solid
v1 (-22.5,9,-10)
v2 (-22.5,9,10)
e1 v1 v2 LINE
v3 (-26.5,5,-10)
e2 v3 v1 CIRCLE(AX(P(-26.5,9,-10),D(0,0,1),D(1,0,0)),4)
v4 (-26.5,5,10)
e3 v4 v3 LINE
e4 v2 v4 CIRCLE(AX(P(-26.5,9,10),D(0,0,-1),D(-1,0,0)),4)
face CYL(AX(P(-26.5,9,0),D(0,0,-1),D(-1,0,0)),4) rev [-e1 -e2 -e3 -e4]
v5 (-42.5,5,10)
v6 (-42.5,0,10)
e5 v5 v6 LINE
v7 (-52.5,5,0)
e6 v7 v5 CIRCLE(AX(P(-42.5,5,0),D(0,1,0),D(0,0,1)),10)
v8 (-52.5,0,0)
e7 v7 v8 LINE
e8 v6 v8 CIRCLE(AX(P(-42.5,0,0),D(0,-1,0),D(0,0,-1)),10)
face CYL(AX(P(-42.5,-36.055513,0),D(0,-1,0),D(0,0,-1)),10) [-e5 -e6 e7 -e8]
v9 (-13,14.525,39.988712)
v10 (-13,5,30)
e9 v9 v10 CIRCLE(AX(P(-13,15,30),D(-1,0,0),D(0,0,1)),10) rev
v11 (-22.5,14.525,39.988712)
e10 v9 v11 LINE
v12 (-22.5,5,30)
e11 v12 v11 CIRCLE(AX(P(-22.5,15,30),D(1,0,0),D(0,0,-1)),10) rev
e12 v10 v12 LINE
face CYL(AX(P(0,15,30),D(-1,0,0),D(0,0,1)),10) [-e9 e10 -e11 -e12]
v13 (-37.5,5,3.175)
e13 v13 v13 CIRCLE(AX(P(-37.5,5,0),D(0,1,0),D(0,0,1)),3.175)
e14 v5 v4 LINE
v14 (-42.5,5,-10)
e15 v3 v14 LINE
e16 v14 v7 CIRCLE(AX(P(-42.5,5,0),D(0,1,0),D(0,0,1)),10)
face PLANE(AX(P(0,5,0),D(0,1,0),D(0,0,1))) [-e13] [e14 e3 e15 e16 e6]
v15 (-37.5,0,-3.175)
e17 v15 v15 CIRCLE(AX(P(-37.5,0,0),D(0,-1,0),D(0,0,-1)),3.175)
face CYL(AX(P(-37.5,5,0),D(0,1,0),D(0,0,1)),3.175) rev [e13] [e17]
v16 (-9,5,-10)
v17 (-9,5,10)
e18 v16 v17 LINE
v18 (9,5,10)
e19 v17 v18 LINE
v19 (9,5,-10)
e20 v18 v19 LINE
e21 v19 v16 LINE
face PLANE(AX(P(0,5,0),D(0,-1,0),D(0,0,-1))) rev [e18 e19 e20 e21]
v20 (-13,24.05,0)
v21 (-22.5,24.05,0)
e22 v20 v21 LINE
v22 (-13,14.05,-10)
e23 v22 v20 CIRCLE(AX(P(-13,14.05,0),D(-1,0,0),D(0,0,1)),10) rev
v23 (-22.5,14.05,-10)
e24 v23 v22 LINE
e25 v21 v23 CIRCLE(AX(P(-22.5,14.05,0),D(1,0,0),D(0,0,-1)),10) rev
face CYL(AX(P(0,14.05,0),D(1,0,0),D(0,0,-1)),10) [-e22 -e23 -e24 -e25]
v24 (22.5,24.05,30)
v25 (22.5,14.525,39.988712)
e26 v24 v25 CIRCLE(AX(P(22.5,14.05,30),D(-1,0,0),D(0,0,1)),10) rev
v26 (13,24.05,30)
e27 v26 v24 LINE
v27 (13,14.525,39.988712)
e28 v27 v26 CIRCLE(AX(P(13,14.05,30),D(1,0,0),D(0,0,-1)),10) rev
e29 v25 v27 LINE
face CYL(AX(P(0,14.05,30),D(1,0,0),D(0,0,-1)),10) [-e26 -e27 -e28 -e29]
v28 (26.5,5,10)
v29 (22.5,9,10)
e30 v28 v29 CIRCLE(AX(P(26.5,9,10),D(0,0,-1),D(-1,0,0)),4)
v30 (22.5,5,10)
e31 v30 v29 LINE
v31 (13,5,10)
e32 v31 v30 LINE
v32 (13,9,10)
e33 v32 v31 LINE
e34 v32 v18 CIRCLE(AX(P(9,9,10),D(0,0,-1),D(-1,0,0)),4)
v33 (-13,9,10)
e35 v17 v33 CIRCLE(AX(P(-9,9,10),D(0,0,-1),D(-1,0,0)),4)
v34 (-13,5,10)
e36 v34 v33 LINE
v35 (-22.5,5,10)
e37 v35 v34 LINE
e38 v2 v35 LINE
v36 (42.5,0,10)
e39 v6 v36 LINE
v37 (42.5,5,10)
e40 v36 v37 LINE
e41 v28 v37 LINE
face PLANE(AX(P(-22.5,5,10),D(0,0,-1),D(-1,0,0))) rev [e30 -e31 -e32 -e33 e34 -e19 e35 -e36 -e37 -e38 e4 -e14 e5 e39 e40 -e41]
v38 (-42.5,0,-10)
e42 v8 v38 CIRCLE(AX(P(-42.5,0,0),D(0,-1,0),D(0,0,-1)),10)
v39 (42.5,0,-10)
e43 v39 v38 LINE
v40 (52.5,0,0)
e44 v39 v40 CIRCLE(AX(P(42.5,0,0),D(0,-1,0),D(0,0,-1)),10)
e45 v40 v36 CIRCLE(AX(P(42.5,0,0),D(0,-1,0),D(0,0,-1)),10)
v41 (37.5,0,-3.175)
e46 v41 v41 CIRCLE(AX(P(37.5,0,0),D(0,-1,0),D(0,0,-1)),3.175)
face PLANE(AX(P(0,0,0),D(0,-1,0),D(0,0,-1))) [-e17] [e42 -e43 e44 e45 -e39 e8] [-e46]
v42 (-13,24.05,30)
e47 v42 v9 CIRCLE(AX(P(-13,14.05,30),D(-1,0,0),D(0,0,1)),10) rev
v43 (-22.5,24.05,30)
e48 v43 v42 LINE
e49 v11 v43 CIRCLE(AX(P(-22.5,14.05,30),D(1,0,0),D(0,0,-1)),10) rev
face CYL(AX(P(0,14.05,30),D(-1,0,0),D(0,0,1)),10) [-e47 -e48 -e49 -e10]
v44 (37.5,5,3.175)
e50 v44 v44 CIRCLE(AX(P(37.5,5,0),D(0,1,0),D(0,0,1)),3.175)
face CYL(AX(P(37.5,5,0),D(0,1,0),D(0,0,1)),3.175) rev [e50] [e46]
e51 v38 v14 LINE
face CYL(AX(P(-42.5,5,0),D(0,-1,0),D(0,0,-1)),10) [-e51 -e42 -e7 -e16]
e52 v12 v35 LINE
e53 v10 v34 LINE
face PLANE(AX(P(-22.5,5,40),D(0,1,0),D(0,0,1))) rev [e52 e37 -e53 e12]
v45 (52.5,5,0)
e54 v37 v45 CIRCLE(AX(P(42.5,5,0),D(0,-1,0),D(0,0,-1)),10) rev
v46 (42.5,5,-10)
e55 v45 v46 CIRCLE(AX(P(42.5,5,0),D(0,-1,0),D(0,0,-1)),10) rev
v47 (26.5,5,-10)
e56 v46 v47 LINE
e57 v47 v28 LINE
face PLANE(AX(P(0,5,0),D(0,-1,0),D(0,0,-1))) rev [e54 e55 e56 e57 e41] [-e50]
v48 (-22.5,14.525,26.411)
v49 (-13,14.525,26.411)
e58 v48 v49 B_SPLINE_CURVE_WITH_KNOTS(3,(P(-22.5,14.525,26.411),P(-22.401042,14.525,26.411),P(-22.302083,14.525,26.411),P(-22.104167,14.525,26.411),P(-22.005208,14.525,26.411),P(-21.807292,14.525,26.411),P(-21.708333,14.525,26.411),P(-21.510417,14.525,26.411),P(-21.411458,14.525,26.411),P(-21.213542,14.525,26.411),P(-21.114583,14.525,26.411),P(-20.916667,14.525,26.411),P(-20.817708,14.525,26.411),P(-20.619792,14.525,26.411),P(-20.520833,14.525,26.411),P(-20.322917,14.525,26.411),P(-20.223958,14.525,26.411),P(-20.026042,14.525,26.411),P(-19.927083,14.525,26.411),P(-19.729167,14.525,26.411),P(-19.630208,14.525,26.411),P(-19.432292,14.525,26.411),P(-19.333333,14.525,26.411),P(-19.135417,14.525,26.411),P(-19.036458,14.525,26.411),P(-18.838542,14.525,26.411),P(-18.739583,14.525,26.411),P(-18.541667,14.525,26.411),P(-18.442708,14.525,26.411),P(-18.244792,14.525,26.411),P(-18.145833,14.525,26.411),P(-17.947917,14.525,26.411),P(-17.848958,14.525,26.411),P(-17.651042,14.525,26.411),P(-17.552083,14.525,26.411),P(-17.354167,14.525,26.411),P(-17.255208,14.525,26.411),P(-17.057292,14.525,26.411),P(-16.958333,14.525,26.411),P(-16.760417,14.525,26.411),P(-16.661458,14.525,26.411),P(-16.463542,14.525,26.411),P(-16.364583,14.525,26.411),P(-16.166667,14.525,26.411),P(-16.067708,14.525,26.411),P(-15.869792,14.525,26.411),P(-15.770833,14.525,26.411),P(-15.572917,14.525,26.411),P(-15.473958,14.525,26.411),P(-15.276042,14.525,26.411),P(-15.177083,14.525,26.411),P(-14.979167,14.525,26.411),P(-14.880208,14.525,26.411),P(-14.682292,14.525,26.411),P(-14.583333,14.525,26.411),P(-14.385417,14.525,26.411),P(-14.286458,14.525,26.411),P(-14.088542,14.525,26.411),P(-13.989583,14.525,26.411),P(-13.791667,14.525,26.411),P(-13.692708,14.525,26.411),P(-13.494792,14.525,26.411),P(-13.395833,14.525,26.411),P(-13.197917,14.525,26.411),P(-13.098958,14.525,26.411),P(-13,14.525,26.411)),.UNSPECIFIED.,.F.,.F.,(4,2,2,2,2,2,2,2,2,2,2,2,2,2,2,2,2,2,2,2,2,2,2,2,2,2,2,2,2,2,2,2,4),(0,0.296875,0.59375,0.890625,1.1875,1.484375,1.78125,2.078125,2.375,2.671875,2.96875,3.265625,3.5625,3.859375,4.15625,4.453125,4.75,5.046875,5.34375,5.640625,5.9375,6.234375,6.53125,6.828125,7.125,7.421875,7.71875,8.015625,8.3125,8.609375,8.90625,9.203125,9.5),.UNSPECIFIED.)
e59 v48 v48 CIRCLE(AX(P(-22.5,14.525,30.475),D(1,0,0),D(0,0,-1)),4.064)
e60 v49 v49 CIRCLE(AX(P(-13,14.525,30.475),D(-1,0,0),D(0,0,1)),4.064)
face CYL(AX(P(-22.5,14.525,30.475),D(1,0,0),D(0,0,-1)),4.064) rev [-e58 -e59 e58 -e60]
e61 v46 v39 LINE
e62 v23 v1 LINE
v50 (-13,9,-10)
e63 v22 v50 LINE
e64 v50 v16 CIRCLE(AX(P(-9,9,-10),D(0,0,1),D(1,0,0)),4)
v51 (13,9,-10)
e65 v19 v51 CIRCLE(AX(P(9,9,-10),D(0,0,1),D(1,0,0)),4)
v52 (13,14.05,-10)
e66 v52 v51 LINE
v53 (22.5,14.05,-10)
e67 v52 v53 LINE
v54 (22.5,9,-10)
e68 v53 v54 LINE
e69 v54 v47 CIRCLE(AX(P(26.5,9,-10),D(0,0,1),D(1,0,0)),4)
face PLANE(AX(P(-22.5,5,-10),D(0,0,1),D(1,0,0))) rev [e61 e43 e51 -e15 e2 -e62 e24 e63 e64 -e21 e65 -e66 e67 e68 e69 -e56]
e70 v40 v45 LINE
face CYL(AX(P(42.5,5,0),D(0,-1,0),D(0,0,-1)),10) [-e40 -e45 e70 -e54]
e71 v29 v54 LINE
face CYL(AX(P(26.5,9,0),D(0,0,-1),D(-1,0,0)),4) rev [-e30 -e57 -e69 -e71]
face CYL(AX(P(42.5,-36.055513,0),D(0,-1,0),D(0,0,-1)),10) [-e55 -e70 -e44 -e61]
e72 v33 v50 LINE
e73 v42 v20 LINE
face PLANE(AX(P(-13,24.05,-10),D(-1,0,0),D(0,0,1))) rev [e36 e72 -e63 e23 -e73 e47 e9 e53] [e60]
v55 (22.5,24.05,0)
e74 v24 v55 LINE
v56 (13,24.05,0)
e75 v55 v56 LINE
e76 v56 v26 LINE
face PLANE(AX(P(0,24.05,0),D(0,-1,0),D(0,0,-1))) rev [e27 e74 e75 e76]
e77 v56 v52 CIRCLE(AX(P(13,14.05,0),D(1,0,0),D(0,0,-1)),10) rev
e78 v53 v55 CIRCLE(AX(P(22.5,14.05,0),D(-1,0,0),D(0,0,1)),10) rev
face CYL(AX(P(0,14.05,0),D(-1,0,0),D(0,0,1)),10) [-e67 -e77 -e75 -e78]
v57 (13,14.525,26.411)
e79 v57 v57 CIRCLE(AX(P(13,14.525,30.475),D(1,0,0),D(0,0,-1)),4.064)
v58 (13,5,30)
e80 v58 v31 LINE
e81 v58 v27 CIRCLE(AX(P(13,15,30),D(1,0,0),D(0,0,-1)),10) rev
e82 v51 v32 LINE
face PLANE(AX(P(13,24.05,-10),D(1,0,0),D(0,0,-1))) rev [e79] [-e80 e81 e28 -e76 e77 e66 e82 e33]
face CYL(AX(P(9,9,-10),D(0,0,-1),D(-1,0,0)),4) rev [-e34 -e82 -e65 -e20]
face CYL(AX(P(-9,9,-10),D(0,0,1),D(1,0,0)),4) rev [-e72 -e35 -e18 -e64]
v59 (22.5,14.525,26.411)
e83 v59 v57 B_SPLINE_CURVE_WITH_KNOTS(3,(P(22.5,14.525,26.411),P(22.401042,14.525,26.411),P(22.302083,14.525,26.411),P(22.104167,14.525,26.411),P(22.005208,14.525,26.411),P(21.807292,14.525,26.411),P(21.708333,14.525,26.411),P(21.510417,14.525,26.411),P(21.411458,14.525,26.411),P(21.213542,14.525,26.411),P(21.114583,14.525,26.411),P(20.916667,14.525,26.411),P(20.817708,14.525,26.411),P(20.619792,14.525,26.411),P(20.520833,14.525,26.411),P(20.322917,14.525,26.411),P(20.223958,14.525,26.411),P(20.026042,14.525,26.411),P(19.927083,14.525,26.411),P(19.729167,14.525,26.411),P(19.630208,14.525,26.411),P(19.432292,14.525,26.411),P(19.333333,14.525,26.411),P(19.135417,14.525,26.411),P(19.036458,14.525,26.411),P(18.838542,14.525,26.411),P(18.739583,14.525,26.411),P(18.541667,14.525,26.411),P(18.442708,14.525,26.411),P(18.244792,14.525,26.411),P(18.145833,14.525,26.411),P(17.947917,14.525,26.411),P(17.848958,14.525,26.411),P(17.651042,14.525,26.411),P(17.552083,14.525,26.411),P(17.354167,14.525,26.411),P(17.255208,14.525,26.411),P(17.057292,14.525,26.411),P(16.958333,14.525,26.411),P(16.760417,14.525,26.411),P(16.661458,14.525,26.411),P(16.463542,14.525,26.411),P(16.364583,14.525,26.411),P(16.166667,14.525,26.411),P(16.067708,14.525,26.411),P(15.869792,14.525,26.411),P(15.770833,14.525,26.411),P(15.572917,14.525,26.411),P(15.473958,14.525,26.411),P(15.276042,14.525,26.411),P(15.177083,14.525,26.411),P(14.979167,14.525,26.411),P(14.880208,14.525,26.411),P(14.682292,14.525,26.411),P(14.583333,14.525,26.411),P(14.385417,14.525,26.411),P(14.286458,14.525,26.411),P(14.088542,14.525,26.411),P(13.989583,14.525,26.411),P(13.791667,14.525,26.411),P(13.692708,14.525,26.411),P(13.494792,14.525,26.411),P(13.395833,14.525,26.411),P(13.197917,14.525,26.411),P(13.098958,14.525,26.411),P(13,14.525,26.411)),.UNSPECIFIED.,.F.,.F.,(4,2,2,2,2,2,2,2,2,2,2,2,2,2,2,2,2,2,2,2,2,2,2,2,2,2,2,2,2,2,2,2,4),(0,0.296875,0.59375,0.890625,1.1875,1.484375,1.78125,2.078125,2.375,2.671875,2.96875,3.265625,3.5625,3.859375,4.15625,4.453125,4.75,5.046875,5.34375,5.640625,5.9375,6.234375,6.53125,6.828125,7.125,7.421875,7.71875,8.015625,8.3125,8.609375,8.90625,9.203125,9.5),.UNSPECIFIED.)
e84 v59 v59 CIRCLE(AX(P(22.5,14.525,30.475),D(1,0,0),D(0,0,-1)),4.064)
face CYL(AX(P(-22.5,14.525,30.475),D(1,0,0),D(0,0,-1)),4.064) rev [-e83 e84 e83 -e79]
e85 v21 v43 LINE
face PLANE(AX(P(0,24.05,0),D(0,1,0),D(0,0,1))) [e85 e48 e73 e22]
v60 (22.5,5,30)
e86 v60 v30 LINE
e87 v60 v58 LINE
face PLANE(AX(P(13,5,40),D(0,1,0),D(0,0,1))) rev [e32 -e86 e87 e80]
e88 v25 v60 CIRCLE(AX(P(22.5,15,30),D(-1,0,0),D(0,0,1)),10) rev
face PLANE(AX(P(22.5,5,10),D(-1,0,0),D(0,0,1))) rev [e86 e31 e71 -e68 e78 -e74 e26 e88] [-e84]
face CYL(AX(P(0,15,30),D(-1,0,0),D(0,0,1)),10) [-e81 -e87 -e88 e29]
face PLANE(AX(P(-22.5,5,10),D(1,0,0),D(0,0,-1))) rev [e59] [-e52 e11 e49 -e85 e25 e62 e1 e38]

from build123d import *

# Parameters (mm, degrees)
SKETCH1_W                   = 45
SKETCH1_H                   = 20
BOSS_EXTRUDE1_DEPTH         = 5
SKETCH2_W                   = 9.5
SKETCH2_H                   = 20
BOSS_EXTRUDE2_DEPTH         = 19.05
SKETCH3_W                   = 9.5
SKETCH3_H                   = 19.05
BOSS_EXTRUDE3_DEPTH         = 30
SKETCH4_R                   = 4.064
CUT_EXTRUDE1_DEPTH          = 65.833652527
SKETCH8_W                   = 30
SKETCH8_H                   = 20
BOSS_EXTRUDE4_DEPTH         = 5
F_1_4_0_25_DIAMETER_HOLE1_D = 6.35
FILLET1_R                   = 10
FILLET2_R                   = 4


with BuildPart() as part:
    # Sketch1 → Boss-Extrude1 (new body)
    with BuildSketch(Plane(origin=(0, 0, 0), x_dir=(1, 0, 0), z_dir=(0, 1, 0))):
        Rectangle(SKETCH1_W, SKETCH1_H)
    extrude(amount=BOSS_EXTRUDE1_DEPTH)

    # Sketch2 → Boss-Extrude2 (add)
    with BuildSketch(Plane(origin=(0, 5, 0), x_dir=(1, 0, 0), z_dir=(0, 1, 0))):
        with Locations((17.75, 0)):
            Rectangle(SKETCH2_W, SKETCH2_H)
        with Locations((-17.75, 0)):
            Rectangle(SKETCH2_W, SKETCH2_H)
    extrude(amount=BOSS_EXTRUDE2_DEPTH)

    # Sketch3 → Boss-Extrude3 (add)
    with BuildSketch(Plane.XY.offset(10)):
        with Locations((-17.75, 14.525)):
            Rectangle(SKETCH3_W, SKETCH3_H)
        with Locations((17.75, 14.525)):
            Rectangle(SKETCH3_W, SKETCH3_H)
    extrude(amount=BOSS_EXTRUDE3_DEPTH)

    # Sketch4 → Cut-Extrude1 (cut, through all)
    with BuildSketch(Plane(origin=(22.5, 0, 0), x_dir=(0, 0, -1), z_dir=(1, 0, 0))):
        with Locations((-30.475, 14.525)):
            Circle(SKETCH4_R)
    extrude(amount=-CUT_EXTRUDE1_DEPTH, mode=Mode.SUBTRACT)

    # Sketch8 → Boss-Extrude4 (add)
    with BuildSketch(Plane(origin=(0, 5, 0), x_dir=(1, 0, 0), z_dir=(0, 1, 0))):
        with Locations((37.5, 0)):
            Rectangle(SKETCH8_W, SKETCH8_H)
        with Locations((-37.5, 0)):
            Rectangle(SKETCH8_W, SKETCH8_H)
    extrude(amount=-BOSS_EXTRUDE4_DEPTH)

    # 1/4 (0.25) Diameter Hole1 (through all)
    with Locations(Plane(origin=(0, 5, 0), x_dir=(1, 0, 0), z_dir=(0, 1, 0))):
        with Locations((37.5, 0), (-37.5, 0)):
            Hole(F_1_4_0_25_DIAMETER_HOLE1_D / 2)

    # Fillet1
    # the kernel refuses this fillet: 10 mm, written as the material it takes off along each edge
    with BuildSketch(Plane(origin=(-47.5, 24.05, -10), x_dir=(0, -1, 0), z_dir=(1, 0, 0)), Plane(origin=(12, 5, 40), x_dir=(0, 0, -1), z_dir=(-1, 0, 0)), Plane(origin=(47.5, 5, 40), x_dir=(0, 0, -1), z_dir=(-1, 0, 0))) as fillet1_piece_1:
        with BuildLine():
            CenterArc((FILLET1_R, -FILLET1_R), FILLET1_R, 90, 90)
            Line((0, -FILLET1_R), (0, 0))
            Line((0, 0), (FILLET1_R, 0))
        make_face()
    extrude(amount=59.5, mode=Mode.SUBTRACT)
    with BuildSketch(Plane(origin=(-47.5, 24.05, 40), x_dir=(0, -1, 0), z_dir=(1, 0, 0)), Plane(origin=(-12, 24.05, 40), x_dir=(0, -1, 0), z_dir=(1, 0, 0)), Plane(origin=(47.5, 24.05, -10), x_dir=(0, -1, 0), z_dir=(-1, 0, 0))) as fillet1_piece_2:
        with BuildLine():
            CenterArc((FILLET1_R, FILLET1_R), FILLET1_R, 180, 90)
            Line((0, FILLET1_R), (0, 0))
            Line((0, 0), (FILLET1_R, 0))
        make_face()
    extrude(amount=59.5, mode=Mode.SUBTRACT)
    with BuildSketch(Plane(origin=(52.5, 30, 10), x_dir=(-1, 0, 0), z_dir=(0, -1, 0)), Plane(origin=(52.5, 30, -10), x_dir=(0, 0, 1), z_dir=(0, -1, 0))) as fillet1_piece_3:
        with BuildLine():
            CenterArc((FILLET1_R, FILLET1_R), FILLET1_R, 180, 90)
            Line((0, FILLET1_R), (0, 0))
            Line((0, 0), (FILLET1_R, 0))
        make_face()
    extrude(amount=55, mode=Mode.SUBTRACT)
    with BuildSketch(Plane(origin=(-52.5, 30, 10), x_dir=(1, 0, 0), z_dir=(0, -1, 0)), Plane(origin=(-52.5, 30, -10), x_dir=(0, 0, 1), z_dir=(0, -1, 0))) as fillet1_piece_4:
        with BuildLine():
            CenterArc((FILLET1_R, -FILLET1_R), FILLET1_R, 90, 90)
            Line((0, -FILLET1_R), (0, 0))
            Line((0, 0), (FILLET1_R, 0))
        make_face()
    extrude(amount=55, mode=Mode.SUBTRACT)

    # Fillet2
    fillet2_edges = [part.edges().sort_by_distance(p)[0] for p in [
        (13, 5, 0),
        (-13, 5, 0),
        (22.5, 5, 0),
        (-22.5, 5, 0),
    ]]
    fillet(fillet2_edges, radius=FILLET2_R)


solid = part.part
